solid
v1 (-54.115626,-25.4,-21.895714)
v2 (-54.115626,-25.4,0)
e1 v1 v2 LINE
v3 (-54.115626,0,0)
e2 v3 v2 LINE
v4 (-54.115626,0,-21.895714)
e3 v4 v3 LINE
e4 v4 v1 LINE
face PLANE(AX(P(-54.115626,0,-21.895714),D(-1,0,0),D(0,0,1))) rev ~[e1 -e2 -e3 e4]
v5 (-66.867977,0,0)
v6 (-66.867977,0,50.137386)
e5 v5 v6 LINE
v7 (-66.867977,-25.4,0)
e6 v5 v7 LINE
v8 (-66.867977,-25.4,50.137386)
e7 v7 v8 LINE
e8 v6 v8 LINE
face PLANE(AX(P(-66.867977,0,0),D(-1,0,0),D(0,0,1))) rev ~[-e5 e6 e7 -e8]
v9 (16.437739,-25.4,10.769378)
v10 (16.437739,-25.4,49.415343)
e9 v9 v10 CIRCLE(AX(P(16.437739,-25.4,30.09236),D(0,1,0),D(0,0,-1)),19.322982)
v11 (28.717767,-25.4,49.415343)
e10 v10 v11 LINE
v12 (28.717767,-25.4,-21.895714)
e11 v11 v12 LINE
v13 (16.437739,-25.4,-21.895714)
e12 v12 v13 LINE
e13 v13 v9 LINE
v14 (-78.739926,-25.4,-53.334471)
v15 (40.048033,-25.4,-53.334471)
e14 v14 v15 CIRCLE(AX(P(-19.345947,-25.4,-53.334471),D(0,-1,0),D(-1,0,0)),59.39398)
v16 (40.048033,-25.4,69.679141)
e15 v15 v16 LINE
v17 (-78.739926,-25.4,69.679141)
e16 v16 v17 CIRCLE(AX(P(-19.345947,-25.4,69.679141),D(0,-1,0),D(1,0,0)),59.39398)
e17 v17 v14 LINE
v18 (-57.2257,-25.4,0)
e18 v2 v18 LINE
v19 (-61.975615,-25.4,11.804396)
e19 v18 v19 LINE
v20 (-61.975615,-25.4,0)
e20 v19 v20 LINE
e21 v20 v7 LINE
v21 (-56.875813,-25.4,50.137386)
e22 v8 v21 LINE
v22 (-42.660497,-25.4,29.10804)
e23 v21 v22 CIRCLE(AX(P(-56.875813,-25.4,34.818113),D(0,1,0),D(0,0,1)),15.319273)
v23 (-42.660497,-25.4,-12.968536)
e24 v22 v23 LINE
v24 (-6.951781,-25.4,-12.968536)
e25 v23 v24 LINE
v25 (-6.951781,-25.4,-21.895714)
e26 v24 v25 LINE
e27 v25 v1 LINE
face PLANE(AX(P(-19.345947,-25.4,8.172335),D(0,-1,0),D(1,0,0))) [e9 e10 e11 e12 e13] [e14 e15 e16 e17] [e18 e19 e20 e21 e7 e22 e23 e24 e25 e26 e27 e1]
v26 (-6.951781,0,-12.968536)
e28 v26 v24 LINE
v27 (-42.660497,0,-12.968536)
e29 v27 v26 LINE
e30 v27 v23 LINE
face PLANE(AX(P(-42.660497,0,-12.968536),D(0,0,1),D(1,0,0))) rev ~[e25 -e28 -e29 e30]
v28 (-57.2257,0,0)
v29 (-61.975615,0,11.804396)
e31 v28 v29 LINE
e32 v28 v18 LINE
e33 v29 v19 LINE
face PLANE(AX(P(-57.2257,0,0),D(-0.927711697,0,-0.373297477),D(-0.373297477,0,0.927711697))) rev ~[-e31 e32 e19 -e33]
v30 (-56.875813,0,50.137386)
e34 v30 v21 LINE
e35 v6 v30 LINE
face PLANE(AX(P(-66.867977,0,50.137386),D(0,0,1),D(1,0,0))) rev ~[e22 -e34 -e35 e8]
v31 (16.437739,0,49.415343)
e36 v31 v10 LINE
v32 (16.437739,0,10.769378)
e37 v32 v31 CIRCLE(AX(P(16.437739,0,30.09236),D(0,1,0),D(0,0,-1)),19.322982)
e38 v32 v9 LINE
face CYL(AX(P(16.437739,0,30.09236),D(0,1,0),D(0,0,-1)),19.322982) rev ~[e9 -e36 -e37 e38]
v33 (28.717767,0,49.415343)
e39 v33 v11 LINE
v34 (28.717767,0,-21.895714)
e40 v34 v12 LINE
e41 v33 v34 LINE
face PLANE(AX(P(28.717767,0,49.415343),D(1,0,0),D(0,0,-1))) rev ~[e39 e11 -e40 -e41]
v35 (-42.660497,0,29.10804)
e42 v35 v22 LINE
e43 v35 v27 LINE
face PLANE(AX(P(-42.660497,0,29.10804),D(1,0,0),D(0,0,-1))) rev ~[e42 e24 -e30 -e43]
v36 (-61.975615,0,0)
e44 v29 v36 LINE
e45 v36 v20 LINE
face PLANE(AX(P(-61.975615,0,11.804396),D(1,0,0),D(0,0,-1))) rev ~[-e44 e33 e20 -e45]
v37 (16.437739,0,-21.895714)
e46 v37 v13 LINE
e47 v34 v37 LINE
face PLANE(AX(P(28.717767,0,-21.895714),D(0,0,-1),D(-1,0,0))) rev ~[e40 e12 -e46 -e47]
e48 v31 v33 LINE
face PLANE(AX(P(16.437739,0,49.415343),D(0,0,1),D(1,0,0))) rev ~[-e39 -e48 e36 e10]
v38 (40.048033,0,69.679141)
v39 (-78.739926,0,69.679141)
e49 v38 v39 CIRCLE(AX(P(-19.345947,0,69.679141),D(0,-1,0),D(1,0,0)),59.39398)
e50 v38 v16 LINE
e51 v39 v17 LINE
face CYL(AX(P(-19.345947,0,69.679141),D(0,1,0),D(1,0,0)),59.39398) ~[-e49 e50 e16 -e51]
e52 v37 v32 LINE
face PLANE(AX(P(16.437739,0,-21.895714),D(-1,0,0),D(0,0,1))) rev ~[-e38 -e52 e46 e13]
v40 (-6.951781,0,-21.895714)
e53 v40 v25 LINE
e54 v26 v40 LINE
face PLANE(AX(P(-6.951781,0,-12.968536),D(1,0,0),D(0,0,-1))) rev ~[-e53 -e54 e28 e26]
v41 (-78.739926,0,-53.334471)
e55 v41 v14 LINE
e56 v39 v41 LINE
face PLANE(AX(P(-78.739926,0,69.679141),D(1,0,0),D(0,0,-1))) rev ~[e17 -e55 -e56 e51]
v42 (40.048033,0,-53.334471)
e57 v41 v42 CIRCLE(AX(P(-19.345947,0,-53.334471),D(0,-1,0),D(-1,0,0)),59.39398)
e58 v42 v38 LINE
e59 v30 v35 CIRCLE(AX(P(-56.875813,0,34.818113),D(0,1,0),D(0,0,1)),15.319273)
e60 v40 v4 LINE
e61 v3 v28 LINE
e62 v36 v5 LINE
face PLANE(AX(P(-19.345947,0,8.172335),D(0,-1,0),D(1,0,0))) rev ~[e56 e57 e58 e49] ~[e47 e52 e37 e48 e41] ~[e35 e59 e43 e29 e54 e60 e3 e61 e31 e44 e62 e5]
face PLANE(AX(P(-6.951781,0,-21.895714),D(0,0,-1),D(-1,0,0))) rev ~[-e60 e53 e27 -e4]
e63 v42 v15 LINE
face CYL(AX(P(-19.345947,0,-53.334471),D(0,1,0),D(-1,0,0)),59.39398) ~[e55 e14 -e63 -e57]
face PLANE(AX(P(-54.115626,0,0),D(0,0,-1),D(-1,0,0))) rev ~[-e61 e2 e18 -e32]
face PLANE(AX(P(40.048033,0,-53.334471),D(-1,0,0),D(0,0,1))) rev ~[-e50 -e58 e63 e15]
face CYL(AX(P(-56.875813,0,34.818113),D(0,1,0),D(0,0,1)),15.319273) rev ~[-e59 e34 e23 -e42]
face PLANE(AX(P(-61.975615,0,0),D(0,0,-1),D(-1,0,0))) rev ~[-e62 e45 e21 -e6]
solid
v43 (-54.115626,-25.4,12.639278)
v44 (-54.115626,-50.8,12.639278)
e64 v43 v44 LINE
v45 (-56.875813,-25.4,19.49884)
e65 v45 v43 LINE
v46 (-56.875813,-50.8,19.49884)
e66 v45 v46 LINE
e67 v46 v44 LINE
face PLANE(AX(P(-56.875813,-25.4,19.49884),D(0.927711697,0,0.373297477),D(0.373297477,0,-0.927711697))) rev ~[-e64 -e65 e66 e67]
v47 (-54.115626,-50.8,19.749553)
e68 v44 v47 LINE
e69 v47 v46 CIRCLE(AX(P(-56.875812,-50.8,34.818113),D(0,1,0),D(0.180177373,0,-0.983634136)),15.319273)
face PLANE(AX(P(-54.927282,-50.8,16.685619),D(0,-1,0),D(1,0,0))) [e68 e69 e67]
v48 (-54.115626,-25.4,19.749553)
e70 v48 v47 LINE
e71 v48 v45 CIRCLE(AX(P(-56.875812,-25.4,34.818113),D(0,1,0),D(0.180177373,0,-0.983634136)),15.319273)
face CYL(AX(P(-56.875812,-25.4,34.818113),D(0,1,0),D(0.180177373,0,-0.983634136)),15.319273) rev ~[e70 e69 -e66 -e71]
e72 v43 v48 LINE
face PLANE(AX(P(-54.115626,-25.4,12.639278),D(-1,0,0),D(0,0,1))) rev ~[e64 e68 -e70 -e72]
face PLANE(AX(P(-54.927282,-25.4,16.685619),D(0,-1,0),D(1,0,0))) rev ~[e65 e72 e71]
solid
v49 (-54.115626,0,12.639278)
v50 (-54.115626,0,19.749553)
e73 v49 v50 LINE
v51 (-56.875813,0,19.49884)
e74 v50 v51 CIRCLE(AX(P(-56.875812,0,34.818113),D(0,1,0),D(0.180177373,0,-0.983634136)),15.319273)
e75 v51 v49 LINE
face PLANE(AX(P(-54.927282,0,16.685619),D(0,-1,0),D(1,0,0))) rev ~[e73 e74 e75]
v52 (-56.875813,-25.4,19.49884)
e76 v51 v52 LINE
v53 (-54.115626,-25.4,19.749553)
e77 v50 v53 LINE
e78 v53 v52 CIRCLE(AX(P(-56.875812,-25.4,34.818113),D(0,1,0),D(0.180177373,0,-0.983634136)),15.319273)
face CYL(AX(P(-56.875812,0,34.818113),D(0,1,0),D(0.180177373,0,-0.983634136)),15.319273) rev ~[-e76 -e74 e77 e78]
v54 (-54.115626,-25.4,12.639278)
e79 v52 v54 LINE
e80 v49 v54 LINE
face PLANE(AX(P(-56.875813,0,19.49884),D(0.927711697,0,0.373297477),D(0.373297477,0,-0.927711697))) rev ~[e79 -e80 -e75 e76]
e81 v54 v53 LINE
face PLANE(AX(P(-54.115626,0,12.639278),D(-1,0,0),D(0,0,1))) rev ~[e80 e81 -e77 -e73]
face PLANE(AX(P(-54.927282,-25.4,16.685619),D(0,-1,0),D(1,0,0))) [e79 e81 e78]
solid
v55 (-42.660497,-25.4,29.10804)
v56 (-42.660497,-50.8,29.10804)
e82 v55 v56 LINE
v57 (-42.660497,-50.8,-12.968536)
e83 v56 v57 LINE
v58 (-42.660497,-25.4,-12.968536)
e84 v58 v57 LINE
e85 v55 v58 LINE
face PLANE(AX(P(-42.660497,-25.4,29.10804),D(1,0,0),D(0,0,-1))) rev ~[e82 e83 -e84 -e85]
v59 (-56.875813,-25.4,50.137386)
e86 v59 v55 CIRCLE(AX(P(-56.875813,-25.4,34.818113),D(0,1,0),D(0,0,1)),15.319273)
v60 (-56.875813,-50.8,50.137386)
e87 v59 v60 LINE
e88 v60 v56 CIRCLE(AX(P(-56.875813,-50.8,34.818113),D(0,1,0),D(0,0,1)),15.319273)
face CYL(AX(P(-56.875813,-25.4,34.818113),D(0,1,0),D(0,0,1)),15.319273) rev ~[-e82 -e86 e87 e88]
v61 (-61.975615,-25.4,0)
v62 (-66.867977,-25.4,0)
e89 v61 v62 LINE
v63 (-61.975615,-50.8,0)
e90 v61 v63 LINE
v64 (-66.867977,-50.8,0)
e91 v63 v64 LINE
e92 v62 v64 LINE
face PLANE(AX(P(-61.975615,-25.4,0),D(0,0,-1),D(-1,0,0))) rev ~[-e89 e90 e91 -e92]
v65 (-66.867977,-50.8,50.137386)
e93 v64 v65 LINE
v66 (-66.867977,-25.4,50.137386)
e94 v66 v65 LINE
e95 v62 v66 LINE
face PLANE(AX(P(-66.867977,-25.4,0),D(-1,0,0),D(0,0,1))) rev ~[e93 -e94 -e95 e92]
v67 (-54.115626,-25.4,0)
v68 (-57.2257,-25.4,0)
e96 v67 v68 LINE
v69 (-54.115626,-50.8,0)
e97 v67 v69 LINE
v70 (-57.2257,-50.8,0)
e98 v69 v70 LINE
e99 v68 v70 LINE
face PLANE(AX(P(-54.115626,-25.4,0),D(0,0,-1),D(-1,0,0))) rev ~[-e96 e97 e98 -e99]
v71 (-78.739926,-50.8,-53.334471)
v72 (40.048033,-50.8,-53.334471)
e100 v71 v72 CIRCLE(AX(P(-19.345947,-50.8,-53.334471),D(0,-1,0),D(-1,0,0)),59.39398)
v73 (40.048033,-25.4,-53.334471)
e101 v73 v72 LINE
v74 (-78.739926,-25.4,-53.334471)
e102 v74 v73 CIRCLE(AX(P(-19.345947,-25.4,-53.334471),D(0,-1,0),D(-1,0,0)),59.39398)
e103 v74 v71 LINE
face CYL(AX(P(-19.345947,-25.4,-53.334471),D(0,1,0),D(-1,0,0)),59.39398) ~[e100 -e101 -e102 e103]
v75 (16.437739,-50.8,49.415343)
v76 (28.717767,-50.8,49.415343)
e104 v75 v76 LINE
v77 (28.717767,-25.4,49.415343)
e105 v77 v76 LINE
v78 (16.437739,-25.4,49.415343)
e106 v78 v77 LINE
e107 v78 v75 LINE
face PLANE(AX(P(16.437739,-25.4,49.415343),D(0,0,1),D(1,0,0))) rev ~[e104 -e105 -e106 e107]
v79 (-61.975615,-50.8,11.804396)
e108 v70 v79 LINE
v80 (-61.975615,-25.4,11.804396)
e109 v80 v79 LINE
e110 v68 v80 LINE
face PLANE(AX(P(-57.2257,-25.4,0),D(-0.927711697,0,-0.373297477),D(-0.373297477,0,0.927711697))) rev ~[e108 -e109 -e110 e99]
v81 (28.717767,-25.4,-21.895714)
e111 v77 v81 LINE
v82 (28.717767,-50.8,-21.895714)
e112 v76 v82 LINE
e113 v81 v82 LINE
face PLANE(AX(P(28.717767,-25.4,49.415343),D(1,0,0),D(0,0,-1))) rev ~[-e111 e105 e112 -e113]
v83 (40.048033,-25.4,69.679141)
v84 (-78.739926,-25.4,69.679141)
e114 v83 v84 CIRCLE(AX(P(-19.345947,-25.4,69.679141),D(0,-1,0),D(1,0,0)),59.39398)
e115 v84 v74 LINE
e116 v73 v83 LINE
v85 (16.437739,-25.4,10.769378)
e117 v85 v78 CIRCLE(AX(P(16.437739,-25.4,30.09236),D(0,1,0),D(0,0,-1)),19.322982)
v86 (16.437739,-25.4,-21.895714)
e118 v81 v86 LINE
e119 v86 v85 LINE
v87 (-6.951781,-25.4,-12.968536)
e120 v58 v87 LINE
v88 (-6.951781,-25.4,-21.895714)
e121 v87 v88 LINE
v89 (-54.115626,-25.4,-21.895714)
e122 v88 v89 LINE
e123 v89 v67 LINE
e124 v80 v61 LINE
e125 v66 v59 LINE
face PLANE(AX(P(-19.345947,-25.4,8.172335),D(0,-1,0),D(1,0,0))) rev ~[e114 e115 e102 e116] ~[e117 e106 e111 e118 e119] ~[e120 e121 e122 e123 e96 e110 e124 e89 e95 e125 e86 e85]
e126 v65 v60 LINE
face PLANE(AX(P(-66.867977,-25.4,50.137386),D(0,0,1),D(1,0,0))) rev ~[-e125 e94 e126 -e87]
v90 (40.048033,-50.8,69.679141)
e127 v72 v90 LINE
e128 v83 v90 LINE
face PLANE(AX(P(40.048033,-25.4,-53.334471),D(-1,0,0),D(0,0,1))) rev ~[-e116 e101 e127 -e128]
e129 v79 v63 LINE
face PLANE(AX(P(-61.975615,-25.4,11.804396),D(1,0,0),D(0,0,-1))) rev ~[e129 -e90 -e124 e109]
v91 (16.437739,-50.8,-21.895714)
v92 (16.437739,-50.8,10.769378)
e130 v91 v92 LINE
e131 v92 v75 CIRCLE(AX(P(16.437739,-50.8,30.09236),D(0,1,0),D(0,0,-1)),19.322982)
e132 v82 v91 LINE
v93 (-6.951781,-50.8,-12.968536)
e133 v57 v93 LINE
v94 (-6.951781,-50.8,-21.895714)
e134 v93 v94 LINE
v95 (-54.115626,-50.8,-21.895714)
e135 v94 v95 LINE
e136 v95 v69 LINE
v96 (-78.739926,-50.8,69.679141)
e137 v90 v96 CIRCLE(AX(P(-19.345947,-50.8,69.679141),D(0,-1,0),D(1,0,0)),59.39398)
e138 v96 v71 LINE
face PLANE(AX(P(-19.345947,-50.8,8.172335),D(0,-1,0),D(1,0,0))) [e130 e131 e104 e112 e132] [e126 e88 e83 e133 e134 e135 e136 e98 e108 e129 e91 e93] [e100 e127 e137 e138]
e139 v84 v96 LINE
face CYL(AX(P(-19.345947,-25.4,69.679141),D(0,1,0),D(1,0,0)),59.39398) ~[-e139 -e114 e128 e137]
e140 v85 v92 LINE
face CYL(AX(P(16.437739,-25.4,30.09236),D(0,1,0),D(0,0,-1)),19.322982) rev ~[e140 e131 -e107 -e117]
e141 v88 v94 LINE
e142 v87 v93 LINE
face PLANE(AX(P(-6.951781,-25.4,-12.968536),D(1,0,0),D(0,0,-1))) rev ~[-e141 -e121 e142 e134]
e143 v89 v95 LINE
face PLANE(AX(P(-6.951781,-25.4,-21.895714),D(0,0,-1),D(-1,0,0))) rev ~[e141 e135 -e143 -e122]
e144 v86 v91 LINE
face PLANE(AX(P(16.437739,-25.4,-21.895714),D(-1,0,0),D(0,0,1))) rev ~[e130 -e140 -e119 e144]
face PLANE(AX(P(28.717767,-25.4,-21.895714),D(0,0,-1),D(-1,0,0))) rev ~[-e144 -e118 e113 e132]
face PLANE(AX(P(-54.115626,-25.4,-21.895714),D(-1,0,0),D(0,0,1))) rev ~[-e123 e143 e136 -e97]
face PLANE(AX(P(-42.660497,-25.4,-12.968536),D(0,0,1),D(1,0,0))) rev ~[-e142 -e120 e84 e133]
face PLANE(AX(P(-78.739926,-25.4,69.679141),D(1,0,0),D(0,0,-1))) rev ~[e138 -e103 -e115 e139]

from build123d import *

# Parameters (mm, degrees)
F1_DEPTH = 25.4
F2_DEPTH = 25.4


with BuildPart() as f1:
    # F0 (on Front) → F1 (new body)
    with BuildSketch(Plane.XZ):
        with BuildLine():
            ThreePointArc((40.048032999, 69.6791410446), (-19.34594661, 129.0731206536), (-78.739926219, 69.6791410446))
            Line((-78.739926219, 69.6791410446), (-78.739926219, -53.3344708383))
            ThreePointArc((-78.739926219, -53.3344708383), (-19.34594661, -112.7284504473), (40.048032999, -53.3344708383))
            Line((40.048032999, -53.3344708383), (40.048032999, 69.6791410446))
        make_face()
        with BuildLine():
            Line((-54.1156261476, -21.8957141042), (-54.1156261476, 0))
            Line((-54.1156261476, 0), (-57.2257004678, 0))
            Line((-57.2257004678, 0), (-61.9756149655, 11.8043959837))
            Line((-61.9756149655, 11.8043959837), (-61.9756149655, 0))
            Line((-61.9756149655, 0), (-66.8679773808, 0))
            Line((-66.8679773808, 0), (-66.8679773808, 50.137385726))
            Line((-66.8679773808, 50.137385726), (-56.875812501, 50.137385726))
            ThreePointArc((-56.875812501, 50.137385726), (-44.1841953971, 43.3973306341), (-42.660497129, 29.1080398561))
            Line((-42.660497129, 29.1080398561), (-42.660497129, -12.968535535))
            Line((-42.660497129, -12.968535535), (-6.9517805241, -12.968535535))
            Line((-6.9517805241, -12.968535535), (-6.9517805241, -21.8957141042))
            Line((-6.9517805241, -21.8957141042), (-54.1156261476, -21.8957141042))
        make_face(mode=Mode.SUBTRACT)
        with BuildLine():
            ThreePointArc((16.4377391338, 10.7693783939), (-2.8852429241, 30.0923604518), (16.4377391338, 49.4153425097))
            Line((16.4377391338, 49.4153425097), (28.7177674472, 49.4153425097))
            Line((28.7177674472, 49.4153425097), (28.7177674472, -21.8957141042))
            Line((28.7177674472, -21.8957141042), (16.4377391338, -21.8957141042))
            Line((16.4377391338, -21.8957141042), (16.4377391338, 10.7693783939))
        make_face(mode=Mode.SUBTRACT)
    extrude(amount=F1_DEPTH)


with BuildPart() as f1b:
    # F0 (on Front) → F1, piece 2 (new body)
    with BuildSketch(Plane.XZ):
        with BuildLine():
            ThreePointArc((-54.1156261476, 19.7495529496), (-55.4900378278, 19.5616468515), (-56.875812501, 19.4988398184))
            Line((-56.875812501, 19.4988398184), (-54.1156261476, 12.6392778789))
            Line((-54.1156261476, 12.6392778789), (-54.1156261476, 19.7495529496))
        make_face()
    extrude(amount=F1_DEPTH)


with BuildPart() as f2:
    # F2 (new): a face of the model
    f2_faces = [f1.part.faces().sort_by_distance(p)[0] for p in [
        (-19.4720318388, -25.4, 7.0988838497),
    ]]
    extrude(f2_faces, amount=F2_DEPTH)


with BuildPart() as f2b:
    # F2#2 (new): a face of the model
    f2_2_faces = [f1b.part.faces().sort_by_distance(p)[0] for p in [
        (-55.0302076674, -25.4, 17.2683137212),
    ]]
    extrude(f2_2_faces, amount=F2_DEPTH)


solid = Compound([f1.part, f1b.part, f2.part, f2b.part])
